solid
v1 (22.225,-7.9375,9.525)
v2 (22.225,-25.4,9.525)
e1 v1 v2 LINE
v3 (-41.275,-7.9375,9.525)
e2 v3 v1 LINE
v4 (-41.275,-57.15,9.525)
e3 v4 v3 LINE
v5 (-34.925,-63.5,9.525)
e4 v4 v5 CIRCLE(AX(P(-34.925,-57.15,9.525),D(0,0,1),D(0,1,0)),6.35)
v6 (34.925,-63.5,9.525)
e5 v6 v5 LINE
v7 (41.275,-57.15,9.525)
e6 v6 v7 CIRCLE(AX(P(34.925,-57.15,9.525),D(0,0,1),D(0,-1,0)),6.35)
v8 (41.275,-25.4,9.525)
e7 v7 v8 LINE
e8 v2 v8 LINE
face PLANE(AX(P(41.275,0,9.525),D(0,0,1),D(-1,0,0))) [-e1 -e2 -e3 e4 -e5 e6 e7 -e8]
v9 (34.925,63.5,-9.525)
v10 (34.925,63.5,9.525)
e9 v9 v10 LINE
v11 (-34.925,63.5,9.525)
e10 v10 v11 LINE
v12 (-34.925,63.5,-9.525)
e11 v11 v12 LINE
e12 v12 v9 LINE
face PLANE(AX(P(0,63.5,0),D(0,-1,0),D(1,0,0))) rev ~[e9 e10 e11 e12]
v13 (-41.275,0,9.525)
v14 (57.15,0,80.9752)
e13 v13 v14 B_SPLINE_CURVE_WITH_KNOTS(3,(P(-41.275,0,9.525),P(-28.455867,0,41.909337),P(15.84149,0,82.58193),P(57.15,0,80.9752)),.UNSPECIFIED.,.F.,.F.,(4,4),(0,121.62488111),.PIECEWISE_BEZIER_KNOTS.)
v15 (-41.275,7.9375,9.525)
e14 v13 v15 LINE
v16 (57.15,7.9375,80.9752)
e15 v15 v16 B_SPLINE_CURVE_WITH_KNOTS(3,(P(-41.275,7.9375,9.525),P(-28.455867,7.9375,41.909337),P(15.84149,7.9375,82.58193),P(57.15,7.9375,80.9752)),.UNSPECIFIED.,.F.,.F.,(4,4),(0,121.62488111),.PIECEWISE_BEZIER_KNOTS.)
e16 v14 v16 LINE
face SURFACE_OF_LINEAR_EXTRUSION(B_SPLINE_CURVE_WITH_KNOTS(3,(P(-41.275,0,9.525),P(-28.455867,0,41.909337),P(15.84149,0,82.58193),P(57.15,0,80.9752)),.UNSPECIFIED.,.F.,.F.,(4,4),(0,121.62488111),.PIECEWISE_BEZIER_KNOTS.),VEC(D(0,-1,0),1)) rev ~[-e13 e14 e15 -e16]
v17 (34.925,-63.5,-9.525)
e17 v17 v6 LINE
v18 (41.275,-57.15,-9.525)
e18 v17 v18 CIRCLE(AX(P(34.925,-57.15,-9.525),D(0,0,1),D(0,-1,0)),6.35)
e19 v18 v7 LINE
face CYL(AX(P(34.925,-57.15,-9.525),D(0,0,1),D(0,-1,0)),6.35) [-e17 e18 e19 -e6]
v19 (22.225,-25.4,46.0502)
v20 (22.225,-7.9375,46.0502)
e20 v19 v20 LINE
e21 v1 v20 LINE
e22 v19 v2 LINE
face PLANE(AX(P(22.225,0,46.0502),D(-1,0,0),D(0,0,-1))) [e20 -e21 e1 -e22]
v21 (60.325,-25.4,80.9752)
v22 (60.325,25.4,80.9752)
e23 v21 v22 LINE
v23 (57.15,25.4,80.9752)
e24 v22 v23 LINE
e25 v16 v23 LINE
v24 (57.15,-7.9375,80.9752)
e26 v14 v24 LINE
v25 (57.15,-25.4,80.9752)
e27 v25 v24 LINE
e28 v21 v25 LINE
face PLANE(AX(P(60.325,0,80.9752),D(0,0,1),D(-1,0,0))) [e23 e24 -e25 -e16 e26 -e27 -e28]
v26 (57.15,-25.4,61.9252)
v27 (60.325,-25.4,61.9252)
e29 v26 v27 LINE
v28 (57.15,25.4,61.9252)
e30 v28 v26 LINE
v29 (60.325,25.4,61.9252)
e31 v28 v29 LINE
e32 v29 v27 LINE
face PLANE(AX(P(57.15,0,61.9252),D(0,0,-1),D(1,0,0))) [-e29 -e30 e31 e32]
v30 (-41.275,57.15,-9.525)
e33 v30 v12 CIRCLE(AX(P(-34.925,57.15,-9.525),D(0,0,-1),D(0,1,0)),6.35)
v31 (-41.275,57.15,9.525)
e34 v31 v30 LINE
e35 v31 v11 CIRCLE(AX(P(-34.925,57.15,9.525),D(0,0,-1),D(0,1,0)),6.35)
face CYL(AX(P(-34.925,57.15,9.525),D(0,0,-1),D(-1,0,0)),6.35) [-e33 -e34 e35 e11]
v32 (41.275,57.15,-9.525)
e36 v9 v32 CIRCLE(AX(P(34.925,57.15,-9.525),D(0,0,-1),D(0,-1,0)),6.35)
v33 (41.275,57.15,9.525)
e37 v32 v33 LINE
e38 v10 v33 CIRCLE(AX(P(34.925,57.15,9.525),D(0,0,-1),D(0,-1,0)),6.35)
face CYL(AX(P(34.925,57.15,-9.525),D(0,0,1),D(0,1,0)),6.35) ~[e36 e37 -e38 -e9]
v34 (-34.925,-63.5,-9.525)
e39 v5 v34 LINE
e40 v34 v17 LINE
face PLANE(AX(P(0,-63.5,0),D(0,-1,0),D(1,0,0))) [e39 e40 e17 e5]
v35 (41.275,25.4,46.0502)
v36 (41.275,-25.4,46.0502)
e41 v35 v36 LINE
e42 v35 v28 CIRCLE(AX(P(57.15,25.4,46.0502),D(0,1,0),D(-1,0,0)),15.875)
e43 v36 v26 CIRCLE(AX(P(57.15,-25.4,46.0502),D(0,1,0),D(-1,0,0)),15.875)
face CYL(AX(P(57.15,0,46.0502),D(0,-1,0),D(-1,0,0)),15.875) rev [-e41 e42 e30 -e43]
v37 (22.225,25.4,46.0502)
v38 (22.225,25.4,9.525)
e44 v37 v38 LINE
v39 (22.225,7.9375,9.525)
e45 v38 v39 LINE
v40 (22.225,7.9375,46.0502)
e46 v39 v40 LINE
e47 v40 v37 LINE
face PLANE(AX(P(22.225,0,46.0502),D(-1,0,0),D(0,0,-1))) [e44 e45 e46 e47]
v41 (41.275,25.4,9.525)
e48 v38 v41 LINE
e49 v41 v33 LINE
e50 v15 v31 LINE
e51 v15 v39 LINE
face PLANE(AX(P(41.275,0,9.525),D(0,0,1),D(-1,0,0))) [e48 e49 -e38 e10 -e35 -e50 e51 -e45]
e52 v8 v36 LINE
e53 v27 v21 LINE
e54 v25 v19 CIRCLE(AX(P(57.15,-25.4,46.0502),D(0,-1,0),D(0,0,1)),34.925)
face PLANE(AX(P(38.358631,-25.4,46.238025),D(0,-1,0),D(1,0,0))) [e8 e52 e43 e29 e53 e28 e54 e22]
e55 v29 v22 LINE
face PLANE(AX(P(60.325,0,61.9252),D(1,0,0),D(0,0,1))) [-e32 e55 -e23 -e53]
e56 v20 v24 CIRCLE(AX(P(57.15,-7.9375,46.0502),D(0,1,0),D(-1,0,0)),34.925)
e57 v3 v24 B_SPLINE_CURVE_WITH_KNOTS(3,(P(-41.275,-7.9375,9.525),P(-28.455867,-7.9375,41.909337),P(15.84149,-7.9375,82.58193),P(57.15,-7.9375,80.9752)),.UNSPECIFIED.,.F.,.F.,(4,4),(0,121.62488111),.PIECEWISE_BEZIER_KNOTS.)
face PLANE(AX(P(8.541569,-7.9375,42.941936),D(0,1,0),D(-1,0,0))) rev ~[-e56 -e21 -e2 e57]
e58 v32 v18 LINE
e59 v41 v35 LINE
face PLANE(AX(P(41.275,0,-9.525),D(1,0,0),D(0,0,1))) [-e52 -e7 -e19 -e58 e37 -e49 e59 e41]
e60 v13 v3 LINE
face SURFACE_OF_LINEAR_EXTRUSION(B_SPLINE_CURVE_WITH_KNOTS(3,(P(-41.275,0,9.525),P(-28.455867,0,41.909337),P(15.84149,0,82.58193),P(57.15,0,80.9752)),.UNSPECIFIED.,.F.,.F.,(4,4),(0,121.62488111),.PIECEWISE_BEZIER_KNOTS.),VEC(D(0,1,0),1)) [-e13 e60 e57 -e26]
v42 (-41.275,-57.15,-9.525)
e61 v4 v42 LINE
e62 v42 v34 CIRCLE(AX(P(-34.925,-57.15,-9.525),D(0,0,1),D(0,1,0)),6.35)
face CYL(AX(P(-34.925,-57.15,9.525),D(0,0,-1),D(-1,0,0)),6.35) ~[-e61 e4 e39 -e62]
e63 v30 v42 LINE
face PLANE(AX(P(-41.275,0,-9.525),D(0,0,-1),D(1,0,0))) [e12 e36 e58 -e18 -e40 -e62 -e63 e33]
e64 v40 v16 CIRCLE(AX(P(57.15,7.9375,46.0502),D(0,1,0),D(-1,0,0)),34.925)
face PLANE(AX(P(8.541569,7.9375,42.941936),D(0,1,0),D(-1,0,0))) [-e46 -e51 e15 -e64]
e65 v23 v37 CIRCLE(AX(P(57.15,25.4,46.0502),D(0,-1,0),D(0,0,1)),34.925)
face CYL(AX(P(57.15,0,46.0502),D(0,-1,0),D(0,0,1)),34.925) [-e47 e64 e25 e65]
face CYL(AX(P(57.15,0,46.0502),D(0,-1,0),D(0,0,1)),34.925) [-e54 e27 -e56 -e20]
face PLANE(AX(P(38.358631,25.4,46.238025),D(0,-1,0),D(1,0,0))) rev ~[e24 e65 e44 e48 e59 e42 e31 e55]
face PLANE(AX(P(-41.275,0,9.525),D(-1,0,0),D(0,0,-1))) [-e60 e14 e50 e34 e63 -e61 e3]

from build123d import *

# Parameters (mm, degrees)
F1_DEPTH = 63.5
F2_DEPTH = 25.4
F3_DEPTH = 7.9375
F5_R     = 6.35


# Not quite as in the source:
# - the program builds the solid bodies; features that only make, move or delete a surface that nothing else refers to are left out


with BuildPart() as f1:
    # F0 (on Front) → F1 (new body, symmetric)
    with BuildSketch(Plane.XZ):
        Polygon((22.225, 9.525), (-41.275, 9.525), (-41.275, -9.525), (41.275, -9.525), (41.275, 9.525), align=None)
    extrude(amount=F1_DEPTH, both=True)

    # F0 (on Front) → F2 (join, symmetric)
    with BuildSketch(Plane.XZ):
        with BuildLine():
            Line((22.225, 46.0502), (22.225, 9.525))
            Line((22.225, 9.525), (41.275, 9.525))
            Line((41.275, 9.525), (41.275, 46.0502))
            ThreePointArc((41.275, 46.0502), (45.9246798487, 57.2755201513), (57.15, 61.9252))
            Line((57.15, 61.9252), (60.325, 61.9252))
            Line((60.325, 61.9252), (60.325, 80.9752))
            Line((60.325, 80.9752), (57.15, 80.9752))
            ThreePointArc((57.15, 80.9752), (32.4542956671, 70.7459043329), (22.225, 46.0502))
        make_face()
    extrude(amount=F2_DEPTH, both=True)

    # F0 (on Front) → F3 (join, symmetric)
    with BuildSketch(Plane.XZ):
        with BuildLine():
            add(Edge.make_bspline(
                [(-41.275, 9.525), (-28.4558665007, 41.9093370438), (15.8414896578, 82.5819298625), (57.15, 80.9752)],
                knots=[0, 0, 0, 0, 121.6248811101, 121.6248811101, 121.6248811101, 121.6248811101], degree=3))
            Line((-41.275, 9.525), (22.225, 9.525))
            Line((22.225, 9.525), (22.225, 46.0502))
            ThreePointArc((22.225, 46.0502), (32.4542956671, 70.7459043329), (57.15, 80.9752))
        make_face()
    extrude(amount=F3_DEPTH, both=True)

    # F5
    f5_edges = [f1.edges().sort_by_distance(p)[0] for p in [
        (-41.275, -63.5, 0),
        (41.275, -63.5, 0),
        (41.275, 63.5, 0),
        (-41.275, 63.5, 0),
    ]]
    fillet(f5_edges, radius=F5_R)


solid = f1.part
